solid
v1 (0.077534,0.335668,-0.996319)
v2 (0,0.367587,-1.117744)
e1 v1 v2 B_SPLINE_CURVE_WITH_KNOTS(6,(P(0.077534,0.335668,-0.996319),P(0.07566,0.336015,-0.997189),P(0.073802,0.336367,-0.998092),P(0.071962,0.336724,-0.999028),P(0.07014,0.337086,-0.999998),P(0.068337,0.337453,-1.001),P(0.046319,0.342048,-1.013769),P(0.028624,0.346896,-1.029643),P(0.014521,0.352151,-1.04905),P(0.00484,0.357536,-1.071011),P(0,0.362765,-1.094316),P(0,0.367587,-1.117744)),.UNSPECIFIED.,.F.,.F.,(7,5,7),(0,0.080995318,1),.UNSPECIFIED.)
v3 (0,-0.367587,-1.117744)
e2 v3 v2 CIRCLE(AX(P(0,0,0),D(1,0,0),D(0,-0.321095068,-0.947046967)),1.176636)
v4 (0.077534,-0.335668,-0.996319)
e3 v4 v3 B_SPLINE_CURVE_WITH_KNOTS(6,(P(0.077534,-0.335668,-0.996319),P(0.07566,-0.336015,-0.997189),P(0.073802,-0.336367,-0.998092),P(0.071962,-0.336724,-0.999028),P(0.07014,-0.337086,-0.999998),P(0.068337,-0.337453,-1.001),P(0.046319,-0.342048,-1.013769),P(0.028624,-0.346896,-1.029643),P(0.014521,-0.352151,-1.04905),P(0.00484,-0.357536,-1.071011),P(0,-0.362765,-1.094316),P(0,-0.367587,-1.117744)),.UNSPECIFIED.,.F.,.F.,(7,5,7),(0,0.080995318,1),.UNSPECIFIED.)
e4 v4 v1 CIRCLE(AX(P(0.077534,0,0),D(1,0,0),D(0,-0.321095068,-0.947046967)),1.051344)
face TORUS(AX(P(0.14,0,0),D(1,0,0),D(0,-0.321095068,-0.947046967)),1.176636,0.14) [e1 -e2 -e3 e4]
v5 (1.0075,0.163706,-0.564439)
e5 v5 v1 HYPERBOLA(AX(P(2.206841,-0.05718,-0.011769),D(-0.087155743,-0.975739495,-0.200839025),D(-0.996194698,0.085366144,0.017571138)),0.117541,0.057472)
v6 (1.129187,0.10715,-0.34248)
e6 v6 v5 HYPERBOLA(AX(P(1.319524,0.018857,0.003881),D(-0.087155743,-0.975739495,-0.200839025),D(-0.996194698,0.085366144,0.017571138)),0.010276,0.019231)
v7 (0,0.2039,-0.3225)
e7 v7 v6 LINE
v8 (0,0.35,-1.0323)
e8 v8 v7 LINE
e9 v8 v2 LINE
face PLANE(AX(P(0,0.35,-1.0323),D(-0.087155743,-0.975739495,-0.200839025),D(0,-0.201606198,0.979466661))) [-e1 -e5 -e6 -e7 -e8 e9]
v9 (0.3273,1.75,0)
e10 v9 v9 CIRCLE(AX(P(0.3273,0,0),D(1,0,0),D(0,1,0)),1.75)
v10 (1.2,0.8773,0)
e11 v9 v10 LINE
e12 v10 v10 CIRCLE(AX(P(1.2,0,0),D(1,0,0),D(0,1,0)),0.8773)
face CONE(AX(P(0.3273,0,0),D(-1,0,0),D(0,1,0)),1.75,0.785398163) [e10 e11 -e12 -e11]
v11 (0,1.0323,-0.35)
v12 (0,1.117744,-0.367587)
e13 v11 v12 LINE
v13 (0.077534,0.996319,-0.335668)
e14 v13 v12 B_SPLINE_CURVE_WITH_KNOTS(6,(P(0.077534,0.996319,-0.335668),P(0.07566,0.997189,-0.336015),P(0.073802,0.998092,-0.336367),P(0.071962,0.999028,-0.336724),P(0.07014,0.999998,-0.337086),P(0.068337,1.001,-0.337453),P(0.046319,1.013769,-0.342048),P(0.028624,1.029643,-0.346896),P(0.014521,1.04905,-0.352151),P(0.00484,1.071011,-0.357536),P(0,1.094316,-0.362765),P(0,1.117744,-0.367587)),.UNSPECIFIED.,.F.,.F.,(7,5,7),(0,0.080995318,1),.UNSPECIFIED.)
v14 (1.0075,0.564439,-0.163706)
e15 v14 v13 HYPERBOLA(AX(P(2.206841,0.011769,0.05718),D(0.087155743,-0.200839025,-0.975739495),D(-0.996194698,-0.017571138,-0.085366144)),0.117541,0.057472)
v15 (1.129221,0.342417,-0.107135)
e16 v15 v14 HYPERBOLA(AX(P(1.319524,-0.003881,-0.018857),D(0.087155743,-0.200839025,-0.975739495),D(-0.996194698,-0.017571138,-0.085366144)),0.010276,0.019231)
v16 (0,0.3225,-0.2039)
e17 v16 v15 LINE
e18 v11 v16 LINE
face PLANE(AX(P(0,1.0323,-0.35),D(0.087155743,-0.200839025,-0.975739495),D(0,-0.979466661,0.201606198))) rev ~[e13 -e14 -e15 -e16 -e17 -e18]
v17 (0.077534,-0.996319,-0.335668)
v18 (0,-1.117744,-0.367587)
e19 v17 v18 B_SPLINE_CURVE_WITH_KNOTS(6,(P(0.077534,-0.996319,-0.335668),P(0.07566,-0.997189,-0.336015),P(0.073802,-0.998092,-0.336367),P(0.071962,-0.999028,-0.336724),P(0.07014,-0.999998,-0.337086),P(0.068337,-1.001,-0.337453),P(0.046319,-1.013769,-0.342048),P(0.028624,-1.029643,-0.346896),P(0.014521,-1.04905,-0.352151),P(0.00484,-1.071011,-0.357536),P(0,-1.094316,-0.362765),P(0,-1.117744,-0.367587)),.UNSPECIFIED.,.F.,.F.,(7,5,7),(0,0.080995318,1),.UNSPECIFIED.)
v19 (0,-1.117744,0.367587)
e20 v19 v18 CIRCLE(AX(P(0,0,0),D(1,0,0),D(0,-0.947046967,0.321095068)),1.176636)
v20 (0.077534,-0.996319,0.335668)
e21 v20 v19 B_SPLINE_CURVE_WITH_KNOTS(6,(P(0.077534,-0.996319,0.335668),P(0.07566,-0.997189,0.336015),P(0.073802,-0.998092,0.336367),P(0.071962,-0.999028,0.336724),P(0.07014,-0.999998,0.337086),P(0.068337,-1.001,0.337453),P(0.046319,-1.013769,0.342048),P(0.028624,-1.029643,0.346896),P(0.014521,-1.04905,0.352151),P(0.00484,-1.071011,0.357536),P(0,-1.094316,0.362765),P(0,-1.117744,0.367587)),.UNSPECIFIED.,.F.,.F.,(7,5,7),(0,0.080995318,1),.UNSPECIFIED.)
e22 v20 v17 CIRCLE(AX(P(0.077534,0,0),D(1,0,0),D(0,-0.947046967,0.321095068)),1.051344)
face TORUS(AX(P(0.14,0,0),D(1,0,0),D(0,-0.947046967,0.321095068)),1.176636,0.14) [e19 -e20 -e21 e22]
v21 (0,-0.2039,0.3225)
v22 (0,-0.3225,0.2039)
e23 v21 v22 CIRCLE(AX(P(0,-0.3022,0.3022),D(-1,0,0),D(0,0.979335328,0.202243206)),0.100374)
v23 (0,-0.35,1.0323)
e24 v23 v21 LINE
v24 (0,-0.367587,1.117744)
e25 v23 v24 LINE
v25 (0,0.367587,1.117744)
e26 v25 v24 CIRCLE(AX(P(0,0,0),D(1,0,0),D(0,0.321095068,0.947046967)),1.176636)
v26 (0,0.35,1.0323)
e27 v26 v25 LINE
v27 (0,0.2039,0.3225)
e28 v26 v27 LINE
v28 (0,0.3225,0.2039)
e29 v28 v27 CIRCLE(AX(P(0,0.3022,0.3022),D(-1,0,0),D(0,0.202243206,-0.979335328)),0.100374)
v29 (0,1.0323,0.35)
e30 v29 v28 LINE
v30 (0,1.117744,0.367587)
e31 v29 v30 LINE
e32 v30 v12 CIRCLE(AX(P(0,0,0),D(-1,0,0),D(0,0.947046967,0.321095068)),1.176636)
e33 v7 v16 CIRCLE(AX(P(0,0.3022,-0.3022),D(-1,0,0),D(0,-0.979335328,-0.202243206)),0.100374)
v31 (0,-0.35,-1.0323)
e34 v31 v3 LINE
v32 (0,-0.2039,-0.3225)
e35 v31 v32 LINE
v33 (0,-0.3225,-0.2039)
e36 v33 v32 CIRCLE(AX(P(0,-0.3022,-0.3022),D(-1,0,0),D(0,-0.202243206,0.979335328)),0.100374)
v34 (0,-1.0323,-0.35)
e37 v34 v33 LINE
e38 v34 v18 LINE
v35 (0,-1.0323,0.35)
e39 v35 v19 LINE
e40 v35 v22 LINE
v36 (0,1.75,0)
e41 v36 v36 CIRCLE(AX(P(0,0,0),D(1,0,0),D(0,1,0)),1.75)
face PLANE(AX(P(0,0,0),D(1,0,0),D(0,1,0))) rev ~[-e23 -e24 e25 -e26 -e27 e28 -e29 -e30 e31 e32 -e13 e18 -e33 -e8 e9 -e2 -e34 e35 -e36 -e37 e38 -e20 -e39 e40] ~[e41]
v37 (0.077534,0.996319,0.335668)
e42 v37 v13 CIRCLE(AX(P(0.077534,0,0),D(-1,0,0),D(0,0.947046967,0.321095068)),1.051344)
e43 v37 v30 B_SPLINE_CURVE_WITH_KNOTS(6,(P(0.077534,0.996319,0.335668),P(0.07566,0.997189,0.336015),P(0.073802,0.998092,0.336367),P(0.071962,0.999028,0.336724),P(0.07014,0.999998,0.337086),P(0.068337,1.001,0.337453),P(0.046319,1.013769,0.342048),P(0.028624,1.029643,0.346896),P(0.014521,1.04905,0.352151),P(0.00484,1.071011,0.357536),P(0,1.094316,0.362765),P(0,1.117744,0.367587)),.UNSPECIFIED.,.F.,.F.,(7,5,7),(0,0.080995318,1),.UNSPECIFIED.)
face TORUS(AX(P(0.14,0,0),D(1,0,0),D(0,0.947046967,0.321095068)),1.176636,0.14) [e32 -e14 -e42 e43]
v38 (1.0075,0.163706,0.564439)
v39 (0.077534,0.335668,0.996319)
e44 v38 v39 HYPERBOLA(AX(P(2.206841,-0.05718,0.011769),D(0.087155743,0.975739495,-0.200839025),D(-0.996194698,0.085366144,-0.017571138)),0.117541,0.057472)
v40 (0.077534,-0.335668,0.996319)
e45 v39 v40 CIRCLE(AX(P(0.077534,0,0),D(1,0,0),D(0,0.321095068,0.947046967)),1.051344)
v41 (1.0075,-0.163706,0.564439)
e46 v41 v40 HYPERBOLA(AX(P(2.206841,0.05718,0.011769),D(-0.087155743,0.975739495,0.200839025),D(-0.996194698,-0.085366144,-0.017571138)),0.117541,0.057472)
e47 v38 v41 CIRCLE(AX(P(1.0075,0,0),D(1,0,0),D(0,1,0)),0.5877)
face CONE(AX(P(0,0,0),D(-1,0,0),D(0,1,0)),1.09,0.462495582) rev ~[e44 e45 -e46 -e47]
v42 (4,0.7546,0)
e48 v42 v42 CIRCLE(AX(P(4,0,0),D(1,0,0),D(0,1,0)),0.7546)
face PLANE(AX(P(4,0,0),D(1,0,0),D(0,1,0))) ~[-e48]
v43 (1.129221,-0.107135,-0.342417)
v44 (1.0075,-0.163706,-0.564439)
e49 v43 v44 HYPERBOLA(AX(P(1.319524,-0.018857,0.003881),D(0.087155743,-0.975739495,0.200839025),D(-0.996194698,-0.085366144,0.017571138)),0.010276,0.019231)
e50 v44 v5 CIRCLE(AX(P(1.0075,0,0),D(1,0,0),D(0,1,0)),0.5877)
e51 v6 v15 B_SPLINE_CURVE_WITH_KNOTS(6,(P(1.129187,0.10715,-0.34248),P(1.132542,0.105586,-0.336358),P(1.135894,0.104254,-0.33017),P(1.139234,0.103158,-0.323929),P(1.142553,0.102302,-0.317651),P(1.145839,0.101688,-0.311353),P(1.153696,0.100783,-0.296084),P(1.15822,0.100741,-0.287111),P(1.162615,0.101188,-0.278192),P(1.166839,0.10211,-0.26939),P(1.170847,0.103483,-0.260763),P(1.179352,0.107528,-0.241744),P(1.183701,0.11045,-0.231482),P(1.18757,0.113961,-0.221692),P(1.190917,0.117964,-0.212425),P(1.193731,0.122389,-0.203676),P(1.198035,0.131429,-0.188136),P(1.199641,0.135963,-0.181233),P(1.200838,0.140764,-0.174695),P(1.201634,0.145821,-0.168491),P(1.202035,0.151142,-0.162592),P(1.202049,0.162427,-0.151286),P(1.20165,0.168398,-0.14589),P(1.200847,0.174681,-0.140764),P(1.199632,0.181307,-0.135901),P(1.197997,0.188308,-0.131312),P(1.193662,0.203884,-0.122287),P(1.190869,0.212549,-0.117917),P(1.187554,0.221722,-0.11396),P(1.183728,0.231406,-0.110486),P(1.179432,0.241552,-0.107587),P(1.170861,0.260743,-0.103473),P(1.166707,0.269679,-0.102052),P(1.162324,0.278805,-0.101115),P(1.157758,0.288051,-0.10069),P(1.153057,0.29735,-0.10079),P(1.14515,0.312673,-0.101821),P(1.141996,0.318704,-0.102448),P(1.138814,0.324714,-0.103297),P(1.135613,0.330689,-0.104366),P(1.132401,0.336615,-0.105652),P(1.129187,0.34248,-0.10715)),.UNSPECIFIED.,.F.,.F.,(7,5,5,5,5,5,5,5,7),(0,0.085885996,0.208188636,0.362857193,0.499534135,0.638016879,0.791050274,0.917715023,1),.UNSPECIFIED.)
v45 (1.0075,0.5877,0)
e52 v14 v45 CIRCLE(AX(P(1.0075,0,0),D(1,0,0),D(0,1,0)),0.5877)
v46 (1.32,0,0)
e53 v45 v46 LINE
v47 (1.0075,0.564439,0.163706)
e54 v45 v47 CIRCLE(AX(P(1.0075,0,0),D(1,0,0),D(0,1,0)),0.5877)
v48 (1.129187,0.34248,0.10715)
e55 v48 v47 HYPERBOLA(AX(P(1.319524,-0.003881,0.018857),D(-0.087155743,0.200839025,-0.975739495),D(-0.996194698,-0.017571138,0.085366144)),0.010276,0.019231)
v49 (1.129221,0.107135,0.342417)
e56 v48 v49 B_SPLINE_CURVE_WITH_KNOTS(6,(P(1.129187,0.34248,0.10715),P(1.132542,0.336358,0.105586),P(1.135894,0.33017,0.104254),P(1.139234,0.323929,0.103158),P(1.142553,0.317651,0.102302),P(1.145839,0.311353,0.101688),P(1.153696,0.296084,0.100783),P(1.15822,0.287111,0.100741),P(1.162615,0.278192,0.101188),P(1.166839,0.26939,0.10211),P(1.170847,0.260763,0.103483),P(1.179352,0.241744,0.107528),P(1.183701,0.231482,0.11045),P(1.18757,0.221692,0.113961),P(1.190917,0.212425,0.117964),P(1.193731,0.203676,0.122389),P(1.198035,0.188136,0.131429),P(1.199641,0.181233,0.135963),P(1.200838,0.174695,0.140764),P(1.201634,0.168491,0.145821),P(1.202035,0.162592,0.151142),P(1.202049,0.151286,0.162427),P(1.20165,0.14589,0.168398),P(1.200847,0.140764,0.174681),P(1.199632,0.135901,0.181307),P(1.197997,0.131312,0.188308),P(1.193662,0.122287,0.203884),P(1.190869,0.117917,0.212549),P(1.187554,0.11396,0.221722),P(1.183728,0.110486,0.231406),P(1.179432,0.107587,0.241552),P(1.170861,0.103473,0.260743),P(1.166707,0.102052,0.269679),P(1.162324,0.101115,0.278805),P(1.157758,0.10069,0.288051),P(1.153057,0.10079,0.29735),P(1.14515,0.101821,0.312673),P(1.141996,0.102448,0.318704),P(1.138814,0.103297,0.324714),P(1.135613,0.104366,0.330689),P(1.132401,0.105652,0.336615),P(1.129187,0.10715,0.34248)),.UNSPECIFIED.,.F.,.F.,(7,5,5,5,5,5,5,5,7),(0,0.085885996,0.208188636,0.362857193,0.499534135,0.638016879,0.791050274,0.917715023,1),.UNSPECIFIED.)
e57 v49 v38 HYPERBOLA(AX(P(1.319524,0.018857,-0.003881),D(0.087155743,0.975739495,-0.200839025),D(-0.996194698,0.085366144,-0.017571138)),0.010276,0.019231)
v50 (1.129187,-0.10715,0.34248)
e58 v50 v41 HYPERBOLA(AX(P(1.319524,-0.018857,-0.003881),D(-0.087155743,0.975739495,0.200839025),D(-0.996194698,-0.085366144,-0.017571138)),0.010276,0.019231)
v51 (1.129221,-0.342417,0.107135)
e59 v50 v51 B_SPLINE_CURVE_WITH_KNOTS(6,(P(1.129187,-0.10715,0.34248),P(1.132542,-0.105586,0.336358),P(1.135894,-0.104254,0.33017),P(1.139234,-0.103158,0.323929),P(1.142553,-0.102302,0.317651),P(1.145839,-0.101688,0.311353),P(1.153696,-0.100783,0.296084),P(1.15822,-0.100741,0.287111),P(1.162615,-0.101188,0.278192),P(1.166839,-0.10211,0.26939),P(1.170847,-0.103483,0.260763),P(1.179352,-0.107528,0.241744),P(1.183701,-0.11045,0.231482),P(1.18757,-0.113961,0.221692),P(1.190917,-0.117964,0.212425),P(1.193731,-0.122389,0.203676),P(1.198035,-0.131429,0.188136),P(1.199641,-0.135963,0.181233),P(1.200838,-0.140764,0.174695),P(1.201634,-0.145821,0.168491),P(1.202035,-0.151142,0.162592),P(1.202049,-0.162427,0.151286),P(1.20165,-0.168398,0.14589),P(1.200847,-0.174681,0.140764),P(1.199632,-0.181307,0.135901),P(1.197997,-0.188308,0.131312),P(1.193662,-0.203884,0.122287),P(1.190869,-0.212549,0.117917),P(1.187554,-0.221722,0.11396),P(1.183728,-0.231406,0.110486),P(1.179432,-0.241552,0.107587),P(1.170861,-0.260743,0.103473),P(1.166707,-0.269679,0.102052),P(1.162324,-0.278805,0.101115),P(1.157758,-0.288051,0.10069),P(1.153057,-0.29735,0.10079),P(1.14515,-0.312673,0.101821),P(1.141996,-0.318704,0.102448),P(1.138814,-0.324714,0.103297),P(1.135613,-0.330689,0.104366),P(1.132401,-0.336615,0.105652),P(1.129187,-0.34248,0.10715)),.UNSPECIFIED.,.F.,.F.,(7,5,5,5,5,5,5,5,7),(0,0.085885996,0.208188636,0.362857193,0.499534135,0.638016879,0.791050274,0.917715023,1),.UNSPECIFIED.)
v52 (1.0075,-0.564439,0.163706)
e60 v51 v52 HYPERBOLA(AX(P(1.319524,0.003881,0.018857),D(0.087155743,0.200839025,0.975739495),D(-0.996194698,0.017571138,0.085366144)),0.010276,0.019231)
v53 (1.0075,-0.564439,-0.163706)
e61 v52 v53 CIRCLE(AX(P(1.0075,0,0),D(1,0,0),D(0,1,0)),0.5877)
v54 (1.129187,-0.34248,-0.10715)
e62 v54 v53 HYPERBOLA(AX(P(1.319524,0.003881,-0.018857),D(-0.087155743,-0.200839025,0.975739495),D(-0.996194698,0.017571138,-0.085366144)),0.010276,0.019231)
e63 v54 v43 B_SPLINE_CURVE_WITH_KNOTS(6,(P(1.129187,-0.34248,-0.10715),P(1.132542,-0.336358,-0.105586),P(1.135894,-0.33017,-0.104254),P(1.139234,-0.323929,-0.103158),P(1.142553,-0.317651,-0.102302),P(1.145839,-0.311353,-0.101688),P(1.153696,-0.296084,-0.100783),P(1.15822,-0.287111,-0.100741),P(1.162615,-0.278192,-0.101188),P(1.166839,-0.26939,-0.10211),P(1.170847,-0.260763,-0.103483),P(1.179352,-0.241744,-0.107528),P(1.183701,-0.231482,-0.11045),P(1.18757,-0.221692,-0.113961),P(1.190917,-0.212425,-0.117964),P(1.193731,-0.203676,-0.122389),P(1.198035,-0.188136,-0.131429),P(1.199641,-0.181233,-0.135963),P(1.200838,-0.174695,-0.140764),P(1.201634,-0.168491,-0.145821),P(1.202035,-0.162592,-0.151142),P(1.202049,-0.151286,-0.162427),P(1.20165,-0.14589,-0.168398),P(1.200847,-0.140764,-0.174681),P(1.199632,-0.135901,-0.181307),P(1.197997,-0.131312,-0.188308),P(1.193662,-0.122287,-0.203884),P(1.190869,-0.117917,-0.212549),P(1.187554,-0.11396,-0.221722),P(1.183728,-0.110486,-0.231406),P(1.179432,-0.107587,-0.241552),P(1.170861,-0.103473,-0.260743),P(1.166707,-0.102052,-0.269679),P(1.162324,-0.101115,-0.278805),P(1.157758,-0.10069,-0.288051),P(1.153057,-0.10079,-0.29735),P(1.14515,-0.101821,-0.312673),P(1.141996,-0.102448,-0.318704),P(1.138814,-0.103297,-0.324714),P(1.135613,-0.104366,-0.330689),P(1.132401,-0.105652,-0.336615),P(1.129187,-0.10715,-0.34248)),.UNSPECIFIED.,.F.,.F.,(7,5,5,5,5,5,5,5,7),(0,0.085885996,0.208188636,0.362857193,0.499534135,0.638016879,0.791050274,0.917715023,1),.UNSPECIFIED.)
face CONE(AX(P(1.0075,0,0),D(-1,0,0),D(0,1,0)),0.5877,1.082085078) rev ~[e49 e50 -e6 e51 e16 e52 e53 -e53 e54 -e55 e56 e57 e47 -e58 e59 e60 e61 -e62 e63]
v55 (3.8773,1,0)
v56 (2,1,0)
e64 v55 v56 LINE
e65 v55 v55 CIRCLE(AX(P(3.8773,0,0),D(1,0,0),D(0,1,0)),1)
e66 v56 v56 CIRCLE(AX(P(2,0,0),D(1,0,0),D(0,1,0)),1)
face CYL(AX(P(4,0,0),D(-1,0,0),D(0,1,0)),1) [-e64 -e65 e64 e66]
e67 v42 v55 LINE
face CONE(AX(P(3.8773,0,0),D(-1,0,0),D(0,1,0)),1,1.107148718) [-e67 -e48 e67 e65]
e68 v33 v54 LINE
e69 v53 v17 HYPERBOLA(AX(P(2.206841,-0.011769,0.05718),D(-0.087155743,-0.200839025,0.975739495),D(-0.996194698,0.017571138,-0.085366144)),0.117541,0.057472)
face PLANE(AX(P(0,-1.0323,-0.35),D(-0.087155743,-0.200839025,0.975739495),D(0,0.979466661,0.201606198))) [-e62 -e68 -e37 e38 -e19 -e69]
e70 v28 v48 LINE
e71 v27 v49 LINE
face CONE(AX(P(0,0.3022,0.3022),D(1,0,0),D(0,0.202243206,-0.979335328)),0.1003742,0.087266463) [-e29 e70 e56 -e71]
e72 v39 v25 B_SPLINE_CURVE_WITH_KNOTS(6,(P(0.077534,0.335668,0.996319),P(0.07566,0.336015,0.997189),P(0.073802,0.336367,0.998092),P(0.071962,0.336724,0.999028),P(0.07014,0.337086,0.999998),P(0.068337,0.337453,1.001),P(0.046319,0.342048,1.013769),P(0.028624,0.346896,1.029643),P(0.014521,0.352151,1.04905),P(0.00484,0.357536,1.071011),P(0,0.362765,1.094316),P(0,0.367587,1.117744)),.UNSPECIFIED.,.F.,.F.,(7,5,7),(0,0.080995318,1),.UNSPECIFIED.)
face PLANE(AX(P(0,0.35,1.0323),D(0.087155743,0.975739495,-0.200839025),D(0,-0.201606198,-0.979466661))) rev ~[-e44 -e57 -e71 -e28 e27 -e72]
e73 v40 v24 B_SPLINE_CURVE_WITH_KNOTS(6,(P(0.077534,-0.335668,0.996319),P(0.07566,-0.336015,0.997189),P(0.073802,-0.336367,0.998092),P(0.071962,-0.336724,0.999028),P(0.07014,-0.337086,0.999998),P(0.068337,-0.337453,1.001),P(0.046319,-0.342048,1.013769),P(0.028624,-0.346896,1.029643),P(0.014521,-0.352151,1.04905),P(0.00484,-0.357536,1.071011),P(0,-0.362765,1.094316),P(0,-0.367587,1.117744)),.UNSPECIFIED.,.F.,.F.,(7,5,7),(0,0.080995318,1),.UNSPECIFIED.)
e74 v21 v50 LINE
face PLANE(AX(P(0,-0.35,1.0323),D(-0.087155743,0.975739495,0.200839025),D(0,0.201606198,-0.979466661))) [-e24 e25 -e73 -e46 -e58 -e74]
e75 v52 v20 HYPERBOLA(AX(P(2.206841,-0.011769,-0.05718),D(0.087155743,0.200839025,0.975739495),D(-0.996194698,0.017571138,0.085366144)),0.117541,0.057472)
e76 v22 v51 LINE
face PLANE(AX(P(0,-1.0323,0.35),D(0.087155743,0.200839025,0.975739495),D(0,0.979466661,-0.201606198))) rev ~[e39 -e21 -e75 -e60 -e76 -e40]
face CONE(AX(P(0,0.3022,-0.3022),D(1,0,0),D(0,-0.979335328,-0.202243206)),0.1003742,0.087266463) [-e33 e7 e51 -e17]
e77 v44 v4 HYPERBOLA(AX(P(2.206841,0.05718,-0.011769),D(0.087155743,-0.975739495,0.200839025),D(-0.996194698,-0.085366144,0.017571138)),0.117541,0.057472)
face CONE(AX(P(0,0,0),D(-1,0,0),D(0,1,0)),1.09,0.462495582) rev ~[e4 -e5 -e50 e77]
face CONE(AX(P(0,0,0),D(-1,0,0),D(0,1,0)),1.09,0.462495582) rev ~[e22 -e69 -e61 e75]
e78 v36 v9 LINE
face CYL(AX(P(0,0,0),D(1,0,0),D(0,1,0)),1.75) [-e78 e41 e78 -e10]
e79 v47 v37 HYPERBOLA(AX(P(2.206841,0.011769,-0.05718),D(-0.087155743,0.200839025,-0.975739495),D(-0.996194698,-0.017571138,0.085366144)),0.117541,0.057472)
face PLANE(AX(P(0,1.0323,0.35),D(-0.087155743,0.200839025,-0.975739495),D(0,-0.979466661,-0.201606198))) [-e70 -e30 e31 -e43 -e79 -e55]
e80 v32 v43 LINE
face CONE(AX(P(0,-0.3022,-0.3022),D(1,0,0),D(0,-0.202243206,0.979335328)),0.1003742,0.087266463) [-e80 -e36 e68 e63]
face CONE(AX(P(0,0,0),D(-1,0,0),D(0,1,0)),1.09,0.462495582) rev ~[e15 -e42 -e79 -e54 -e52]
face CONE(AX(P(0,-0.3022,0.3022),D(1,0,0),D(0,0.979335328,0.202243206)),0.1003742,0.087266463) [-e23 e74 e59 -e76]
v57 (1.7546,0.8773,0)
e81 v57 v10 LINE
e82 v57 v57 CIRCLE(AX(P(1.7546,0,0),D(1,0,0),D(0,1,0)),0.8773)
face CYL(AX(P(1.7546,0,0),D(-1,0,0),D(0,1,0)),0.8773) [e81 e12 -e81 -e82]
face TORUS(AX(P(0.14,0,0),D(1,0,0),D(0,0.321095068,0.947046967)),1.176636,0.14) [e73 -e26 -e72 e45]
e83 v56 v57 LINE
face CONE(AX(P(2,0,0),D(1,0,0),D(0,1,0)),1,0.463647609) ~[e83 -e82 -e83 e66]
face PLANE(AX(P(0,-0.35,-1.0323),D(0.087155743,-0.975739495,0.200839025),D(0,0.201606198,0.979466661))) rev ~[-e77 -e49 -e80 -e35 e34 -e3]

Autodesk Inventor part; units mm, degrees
ref_plane "YZ Plane" through (0, 0, 0) normal (1, 0, 0) x (0, 1, 0)
ref_plane "XZ Plane" through (0, 0, 0) normal (0, 1, 0) x (-1, 0, 0)
sketch "Sketch1" plane through (0, 0, 0) normal (0, 0, 1) x (1, 0, 0)
  line L0 (1.32, 0) -> (4, 0)
  line L1 (4, 0) -> (4, 1)
  line L2 (4, 1) -> (2, 1)
  line L3 (2, 1) -> (1.7546, 0.8773)
  line L4 (1.7546, 0.8773) -> (1.2, 0.8773)
  line L5 (0, 1.75) -> (0, 1.09)
  line L6 (0, 1.09) -> (1.0075, 0.5877)
  line L7 (1.0075, 0.5877) -> (1.32, 0)
  line L8 (-0.8, 0) -> (4.8, 0) projected
  line L9 (0, -0.35) -> (0, 2.1) projected
  line L10 (0, 1.75) -> (0.3273, 1.75)
  line L11 (0.3273, 1.75) -> (1.2, 0.8773)
  line L12 (2, 1) -> (1.0773, 1) construction
  dimension "d1" = 2
  dimension "d2" = 2
  dimension "d3" = 1.7546
  dimension "d4" = 2.18
  dimension "d5" = 26.5
  dimension "d6" = 62
  dimension "d7" = 1.32
  dimension "d8" = 0.2454
  dimension "d12" = 3.5
  dimension "d13" = 45
  dimension "d15" = 4
  dimension "d24" = 1.2
revolve "Body" add sketch "Sketch1" angle 360 about axis through (1.32, 0, 0) along (1, 0, 0) contours L7 L6 L5 L10 L11 L4 L3 L2 L1 L0
sketch "Sketch2" plane through (0, 0, 0) normal (-1, 0, 0) x (0, 0, 1)
  line L0 (0, 1.09) -> (0, 0) construction
  line L1 (0, 0) -> (1.09, 0) construction
  arc A0 (0.327, 0) -> (0, 0.327) centre (0, 0) ccw construction
  arc A1 (0.3815, 0) -> (0, 0.3815) centre (0, 0) ccw construction
  arc A2 (1.0323, 0.35) -> (0.35, 1.0323) centre (0, 0) ccw
  line L2 (0, 0) -> (0.7707, 0.7707) construction
  line L3 (0.35, 1.0323) -> (0.2039, 0.3225)
  line L4 (1.0323, 0.35) -> (0.3225, 0.2039)
  arc A3 (0.35, 1.0323) -> (0, 1.09) centre (0, 0) ccw
  arc A4 (1.09, 0) -> (1.0323, 0.35) centre (0, 0) ccw
  line L5 (0, -2.45) -> (0, 2.45) projected
  line L6 (-2.45, 0) -> (2.45, 0) projected
  arc A5 (0.35, -1.0323) -> (1.0323, -0.35) centre (0, 0) ccw
  line L7 (0.35, -1.0323) -> (0.2039, -0.3225)
  line L8 (1.0323, -0.35) -> (0.3225, -0.2039)
  arc A6 (0, -1.09) -> (0.35, -1.0323) centre (0, 0) ccw
  arc A7 (1.0323, -0.35) -> (1.09, 0) centre (0, 0) ccw
  arc A8 (-0.35, 1.0323) -> (-1.0323, 0.35) centre (0, 0) ccw
  line L9 (-0.35, 1.0323) -> (-0.2039, 0.3225)
  line L10 (-1.0323, 0.35) -> (-0.3225, 0.2039)
  arc A9 (0, 1.09) -> (-0.35, 1.0323) centre (0, 0) ccw
  arc A10 (-1.0323, 0.35) -> (-1.09, 0) centre (0, 0) ccw
  arc A11 (-0.35, -1.0323) -> (0, -1.09) centre (0, 0) ccw
  arc A12 (-1.0323, -0.35) -> (-0.35, -1.0323) centre (0, 0) ccw
  arc A13 (-1.09, 0) -> (-1.0323, -0.35) centre (0, 0) ccw
  line L11 (-1.0323, -0.35) -> (-0.3225, -0.2039)
  line L12 (-0.35, -1.0323) -> (-0.2039, -0.3225)
  arc A14 (0.2039, 0.3225) -> (0.3225, 0.2039) centre (0.3022, 0.3022) ccw
  arc A15 (0.3225, -0.2039) -> (0.2039, -0.3225) centre (0.3022, -0.3022) ccw
  arc A16 (-0.3225, 0.2039) -> (-0.2039, 0.3225) centre (-0.3022, 0.3022) ccw
  arc A17 (-0.2039, -0.3225) -> (-0.3225, -0.2039) centre (-0.3022, -0.3022) ccw
  point P0 (0.7707, -0.7707)
  point P1 (-0.7707, 0.7707)
  point P2 (-0.7707, -0.7707)
  dimension "d17" = 0.654
  dimension "d18" = 0.763
  dimension "d19" = 2.18
  dimension "d20" = 45
  dimension "d21" = 0.35
extrude "Slot" add sketch "Sketch2" against normal up to next draft 5 contours L4 A14 L3 A2 | A5 L7 A15 L8 | L9 A16 L10 A8 | A12 L11 A17 L12
fillet "Fillet1" radius 0.14 4 edges at (0, 1.09, 0) (0, 0, -1.09) (0, -1.09, 0) (0, 0, 1.09)
thread "Thread" size "M2x0.4" class "6g" standard "ISO Metric profile" length 2
chamfer "Chamfer1" distance 0.2454 distance2 0.1227 1 edges at (4, -1, 0) measured on face at (4, 0.479, -0.3842)
ref_plane "Work Plane2" through (3.35, 0, 0) normal (0, 0, -1) x (1, 0, 0)
equation "\"d1\" = GEL"
equation "\"d2\" = GD"
equation "\"d3\" = BDM"
equation "\"d4\" = SDM"
equation "\"d7\" = INTI"
equation "\"d8\" = GAL"
equation "\"d12\" = KOD"
equation "\"d13\" = 0.5 * SEWI"
equation "\"d15\" = NLG"
equation "\"d24\" = KOH"
equation "\"d17\" = 0.3 * SDM"
equation "\"d18\" = 0.35 * SDM"
equation "\"d19\" = SDM"
equation "\"d21\" = 0.5 * SBR"
equation "\"d23\" = 0.2 * SBR"
equation "\"d10\" = GEL"
equation "\"d25\" = -0.5 * SPD + 0.5 * GD"
equation "\"d26\" = 0.5 * GAL"
equation "\"NLG\" = 4"
equation "\"GEL\" = 2"
equation "\"GAL\" = 0.61345 * PTC"
equation "\"SPD\" = NND - 1.2269 * PTC"
equation "\"KOD\" = 3.5"
equation "\"KOH\" = 1.2"
equation "\"SBR\" = 0.7"
equation "\"INTI\" = 1.32"
equation "\"SDM\" = 2.18"
equation "\"GD\" = NND"
equation "\"BDM\" = NND - GAL"
equation "\"SEWI\" = 90deg"
equation "\"d9\" = SDM"
equation "\"GUL\" = 0.61345 * PTC"
equation "\"TOA\" = 30deg"
equation "\"EPV\" = 2.2"
equation "\"THREADDIA\" = 2"
equation "\"RR\" = 0.2"
equation "\"PTC\" = 0.4"
equation "\"NND\" = 2"
equation "\"GD1\" = THREADDIA - 1.2269 * PTC"
properties part number "AS 1427 - M2 x 4(5)" material "Steel, Mild"
